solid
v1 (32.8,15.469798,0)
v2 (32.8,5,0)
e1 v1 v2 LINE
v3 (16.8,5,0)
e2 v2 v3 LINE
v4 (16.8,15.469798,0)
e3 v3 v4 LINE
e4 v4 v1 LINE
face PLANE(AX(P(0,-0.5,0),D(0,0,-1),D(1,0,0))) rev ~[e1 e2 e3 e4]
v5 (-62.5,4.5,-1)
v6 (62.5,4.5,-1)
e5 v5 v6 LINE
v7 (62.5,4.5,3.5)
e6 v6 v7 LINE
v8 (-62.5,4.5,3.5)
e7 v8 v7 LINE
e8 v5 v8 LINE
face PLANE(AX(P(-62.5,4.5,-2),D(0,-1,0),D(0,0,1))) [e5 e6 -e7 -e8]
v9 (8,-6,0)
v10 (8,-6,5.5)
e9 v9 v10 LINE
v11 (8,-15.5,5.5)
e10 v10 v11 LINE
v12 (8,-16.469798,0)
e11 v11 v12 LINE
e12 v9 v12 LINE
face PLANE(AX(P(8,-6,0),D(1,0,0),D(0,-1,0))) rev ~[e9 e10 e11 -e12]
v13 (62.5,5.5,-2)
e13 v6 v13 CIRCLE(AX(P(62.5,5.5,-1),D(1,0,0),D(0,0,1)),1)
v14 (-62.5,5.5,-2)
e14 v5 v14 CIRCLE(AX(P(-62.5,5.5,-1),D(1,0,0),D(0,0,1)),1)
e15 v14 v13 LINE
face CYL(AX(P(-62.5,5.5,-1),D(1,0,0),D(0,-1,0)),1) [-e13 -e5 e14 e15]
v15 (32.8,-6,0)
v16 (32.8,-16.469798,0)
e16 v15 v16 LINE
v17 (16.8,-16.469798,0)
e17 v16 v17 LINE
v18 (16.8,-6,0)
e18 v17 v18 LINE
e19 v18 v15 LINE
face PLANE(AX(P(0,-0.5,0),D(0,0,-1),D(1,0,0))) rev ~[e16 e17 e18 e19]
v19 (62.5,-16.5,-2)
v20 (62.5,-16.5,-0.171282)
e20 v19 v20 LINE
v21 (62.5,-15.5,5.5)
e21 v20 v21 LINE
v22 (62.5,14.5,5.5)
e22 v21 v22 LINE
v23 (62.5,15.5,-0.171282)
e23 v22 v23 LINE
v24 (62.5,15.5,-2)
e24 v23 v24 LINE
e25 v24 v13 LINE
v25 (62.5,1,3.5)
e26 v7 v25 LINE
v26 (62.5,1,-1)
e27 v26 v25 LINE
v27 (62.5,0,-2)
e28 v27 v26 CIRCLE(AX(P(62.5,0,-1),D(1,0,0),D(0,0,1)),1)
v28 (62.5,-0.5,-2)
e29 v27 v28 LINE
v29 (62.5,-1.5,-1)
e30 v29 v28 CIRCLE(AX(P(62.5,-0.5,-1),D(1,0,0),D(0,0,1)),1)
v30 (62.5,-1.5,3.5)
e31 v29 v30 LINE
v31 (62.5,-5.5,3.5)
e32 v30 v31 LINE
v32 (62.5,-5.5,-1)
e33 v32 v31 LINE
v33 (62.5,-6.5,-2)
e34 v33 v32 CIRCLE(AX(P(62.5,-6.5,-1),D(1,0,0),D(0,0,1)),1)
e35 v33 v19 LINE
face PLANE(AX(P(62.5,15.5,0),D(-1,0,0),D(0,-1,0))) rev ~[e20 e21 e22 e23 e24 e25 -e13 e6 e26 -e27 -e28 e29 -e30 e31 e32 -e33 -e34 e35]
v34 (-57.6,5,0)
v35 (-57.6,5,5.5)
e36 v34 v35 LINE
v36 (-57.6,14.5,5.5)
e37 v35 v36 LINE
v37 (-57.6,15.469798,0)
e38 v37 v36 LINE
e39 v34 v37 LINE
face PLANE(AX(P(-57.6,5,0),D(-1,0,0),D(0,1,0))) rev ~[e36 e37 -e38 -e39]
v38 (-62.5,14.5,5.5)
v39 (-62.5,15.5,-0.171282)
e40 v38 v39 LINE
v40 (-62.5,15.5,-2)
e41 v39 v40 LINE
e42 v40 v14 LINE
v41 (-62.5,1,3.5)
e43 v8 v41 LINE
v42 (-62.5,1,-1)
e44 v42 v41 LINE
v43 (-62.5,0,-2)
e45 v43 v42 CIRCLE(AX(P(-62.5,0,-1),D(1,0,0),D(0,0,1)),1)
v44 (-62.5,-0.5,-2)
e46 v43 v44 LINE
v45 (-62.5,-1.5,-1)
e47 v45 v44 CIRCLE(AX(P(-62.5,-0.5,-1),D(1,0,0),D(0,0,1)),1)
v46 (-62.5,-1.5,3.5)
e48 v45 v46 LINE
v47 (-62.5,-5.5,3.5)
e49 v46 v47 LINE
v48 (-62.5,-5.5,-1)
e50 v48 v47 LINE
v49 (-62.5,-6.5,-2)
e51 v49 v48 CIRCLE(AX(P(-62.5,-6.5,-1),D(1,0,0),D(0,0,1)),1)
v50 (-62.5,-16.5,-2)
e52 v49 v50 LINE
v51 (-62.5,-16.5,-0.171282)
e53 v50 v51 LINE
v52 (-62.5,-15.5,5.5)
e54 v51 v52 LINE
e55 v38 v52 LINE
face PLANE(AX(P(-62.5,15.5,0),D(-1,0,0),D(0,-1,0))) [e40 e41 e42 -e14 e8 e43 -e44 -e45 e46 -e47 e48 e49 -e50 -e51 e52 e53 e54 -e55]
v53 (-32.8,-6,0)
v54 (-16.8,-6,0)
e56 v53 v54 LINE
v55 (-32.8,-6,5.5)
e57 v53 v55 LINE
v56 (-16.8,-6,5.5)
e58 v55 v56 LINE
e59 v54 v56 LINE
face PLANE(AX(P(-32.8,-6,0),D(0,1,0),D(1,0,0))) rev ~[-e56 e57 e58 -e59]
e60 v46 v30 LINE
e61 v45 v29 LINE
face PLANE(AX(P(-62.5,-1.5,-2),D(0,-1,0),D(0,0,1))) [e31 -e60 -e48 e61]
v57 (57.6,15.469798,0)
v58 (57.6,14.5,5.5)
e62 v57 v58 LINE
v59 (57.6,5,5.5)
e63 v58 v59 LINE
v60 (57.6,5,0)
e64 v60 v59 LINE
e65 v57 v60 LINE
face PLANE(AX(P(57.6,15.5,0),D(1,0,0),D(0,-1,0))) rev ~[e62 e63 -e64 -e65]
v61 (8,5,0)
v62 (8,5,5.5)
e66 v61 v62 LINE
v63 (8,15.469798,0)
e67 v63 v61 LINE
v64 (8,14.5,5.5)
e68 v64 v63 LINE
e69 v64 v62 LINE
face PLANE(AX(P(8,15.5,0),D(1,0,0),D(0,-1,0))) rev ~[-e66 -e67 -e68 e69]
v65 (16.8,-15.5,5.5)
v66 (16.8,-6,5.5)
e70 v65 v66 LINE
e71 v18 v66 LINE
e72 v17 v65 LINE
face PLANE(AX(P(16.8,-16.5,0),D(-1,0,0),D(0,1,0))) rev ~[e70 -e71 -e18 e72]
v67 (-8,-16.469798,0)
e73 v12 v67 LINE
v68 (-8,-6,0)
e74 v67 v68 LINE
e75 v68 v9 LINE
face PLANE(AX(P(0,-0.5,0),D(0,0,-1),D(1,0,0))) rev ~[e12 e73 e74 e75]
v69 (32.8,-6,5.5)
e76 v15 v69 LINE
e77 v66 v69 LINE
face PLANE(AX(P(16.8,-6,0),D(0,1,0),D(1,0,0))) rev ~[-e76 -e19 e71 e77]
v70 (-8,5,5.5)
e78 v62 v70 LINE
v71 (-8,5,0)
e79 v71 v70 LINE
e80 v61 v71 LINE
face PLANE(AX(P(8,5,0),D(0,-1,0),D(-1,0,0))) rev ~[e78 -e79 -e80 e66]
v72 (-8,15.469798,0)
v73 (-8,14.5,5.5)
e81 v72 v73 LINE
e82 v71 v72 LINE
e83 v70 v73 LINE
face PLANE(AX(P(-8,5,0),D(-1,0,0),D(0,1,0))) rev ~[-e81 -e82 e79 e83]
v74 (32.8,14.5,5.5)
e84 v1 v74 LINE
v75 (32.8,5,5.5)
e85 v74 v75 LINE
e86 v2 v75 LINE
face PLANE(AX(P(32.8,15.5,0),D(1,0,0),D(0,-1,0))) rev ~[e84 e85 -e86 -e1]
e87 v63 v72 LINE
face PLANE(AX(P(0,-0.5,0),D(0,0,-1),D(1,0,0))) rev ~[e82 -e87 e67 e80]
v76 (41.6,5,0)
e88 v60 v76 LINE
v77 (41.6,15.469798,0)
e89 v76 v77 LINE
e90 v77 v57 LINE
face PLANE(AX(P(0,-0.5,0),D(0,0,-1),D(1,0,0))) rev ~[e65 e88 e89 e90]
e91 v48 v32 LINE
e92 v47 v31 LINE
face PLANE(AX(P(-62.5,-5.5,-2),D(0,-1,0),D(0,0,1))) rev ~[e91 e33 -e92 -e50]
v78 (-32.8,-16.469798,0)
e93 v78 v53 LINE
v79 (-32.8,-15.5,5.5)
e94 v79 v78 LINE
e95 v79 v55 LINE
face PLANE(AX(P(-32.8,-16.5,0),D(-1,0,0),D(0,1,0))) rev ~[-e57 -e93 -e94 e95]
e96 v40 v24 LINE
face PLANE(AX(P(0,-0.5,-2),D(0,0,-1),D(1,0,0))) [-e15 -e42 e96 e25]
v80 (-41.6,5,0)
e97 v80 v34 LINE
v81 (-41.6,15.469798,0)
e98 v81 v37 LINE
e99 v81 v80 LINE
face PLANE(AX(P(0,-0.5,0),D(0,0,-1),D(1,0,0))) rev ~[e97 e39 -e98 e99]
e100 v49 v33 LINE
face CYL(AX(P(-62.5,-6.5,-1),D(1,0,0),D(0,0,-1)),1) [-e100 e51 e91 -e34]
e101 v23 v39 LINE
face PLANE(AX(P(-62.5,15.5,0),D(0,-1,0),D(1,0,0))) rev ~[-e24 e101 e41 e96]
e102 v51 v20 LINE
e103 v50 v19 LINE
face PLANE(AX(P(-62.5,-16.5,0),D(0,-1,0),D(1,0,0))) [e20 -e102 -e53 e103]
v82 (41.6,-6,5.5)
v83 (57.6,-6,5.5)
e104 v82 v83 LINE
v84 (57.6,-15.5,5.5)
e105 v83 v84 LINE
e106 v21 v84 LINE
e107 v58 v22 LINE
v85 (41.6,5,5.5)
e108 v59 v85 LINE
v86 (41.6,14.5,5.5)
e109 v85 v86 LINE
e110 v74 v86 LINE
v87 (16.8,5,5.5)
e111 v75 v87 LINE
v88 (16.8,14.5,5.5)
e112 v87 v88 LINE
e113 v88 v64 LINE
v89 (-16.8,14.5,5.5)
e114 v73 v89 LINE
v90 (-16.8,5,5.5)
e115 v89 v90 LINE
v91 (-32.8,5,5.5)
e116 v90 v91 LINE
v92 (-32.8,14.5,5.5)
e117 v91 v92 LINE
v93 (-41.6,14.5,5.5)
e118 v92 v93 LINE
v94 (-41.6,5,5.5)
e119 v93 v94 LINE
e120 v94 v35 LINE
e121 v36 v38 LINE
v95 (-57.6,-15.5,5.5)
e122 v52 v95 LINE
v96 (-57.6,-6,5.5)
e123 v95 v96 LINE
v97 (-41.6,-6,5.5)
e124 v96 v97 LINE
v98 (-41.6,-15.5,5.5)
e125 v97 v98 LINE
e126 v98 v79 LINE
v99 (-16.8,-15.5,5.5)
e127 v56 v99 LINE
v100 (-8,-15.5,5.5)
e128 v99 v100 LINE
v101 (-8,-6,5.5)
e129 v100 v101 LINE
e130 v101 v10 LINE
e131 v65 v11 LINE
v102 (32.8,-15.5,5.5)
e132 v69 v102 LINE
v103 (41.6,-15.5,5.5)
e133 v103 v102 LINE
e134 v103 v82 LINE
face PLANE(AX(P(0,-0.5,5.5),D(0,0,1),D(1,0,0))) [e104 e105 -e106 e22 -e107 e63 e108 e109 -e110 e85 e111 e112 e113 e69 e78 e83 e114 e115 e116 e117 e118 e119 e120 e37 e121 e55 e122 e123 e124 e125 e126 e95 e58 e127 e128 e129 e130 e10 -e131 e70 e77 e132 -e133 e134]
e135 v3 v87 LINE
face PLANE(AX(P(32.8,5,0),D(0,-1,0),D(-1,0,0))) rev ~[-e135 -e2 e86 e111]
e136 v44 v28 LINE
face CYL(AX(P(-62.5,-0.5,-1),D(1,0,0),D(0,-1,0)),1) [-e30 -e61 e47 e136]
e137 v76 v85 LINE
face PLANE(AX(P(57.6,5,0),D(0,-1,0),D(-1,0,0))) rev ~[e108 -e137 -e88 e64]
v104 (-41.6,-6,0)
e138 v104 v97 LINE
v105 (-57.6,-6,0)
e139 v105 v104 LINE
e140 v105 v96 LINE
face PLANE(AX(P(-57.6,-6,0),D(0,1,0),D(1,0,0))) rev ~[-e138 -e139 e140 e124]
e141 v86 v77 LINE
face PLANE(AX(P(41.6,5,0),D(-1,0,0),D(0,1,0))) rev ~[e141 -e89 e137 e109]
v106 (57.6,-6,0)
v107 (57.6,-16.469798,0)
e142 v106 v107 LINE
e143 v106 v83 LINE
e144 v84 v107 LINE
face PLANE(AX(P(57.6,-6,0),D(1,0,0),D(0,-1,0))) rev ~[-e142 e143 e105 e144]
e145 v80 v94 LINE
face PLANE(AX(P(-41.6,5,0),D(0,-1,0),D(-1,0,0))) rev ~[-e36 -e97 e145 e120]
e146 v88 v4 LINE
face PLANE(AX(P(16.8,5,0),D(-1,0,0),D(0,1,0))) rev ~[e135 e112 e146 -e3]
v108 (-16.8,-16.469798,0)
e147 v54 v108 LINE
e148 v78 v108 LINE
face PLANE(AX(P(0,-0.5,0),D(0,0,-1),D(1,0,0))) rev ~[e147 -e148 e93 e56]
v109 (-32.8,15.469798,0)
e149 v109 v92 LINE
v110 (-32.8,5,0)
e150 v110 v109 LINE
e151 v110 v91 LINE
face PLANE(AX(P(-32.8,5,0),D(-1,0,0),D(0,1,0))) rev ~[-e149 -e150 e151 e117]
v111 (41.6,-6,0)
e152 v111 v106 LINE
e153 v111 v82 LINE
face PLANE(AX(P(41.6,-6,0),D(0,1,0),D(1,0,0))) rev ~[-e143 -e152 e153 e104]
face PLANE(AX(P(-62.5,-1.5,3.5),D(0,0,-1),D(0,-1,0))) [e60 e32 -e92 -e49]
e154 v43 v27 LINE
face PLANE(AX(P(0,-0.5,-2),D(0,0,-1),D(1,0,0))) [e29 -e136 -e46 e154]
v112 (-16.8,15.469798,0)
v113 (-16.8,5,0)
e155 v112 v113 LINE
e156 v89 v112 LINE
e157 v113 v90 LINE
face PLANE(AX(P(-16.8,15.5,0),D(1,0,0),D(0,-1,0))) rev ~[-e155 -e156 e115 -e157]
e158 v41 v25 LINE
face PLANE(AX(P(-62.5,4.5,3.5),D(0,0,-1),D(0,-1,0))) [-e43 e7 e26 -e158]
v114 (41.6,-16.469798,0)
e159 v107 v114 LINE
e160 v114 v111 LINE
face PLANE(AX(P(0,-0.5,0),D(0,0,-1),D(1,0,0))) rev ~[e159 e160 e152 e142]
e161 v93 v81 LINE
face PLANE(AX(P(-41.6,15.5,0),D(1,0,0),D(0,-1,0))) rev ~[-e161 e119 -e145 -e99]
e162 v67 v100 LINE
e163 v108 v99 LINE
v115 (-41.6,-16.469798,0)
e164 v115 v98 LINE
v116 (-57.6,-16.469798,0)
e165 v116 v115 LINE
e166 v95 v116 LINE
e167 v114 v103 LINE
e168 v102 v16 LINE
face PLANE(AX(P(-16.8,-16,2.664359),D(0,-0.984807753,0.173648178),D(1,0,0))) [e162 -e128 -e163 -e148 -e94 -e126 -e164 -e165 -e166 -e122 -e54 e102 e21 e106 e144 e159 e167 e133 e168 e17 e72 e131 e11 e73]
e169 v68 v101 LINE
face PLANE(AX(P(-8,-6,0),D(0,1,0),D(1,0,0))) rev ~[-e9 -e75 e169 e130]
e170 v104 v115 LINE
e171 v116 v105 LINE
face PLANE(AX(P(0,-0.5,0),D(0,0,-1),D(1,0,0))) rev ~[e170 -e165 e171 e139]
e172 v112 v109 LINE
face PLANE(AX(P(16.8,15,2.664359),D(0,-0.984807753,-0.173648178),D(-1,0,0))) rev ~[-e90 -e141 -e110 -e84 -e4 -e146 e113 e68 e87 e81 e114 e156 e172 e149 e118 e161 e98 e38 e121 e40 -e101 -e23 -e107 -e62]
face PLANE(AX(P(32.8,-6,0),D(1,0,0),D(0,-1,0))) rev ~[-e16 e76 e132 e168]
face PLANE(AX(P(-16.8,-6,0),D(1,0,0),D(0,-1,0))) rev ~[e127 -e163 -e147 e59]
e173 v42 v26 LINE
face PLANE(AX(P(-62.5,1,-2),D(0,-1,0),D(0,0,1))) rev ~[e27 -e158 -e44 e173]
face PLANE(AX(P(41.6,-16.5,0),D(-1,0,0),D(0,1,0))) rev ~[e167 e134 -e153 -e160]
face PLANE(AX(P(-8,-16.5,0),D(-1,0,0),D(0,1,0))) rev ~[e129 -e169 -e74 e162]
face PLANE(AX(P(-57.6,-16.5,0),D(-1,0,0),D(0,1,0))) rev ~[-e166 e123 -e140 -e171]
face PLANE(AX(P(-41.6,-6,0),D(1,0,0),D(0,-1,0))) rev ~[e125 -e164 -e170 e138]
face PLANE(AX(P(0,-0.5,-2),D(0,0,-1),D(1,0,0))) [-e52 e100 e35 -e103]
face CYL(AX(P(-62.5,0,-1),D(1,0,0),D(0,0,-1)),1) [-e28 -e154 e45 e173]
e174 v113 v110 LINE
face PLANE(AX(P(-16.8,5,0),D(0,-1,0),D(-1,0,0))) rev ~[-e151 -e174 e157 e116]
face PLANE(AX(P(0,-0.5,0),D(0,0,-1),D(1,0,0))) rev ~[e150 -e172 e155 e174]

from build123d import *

# Parameters (mm, degrees)
F1_DEPTH    = 5.5
F2_W        = 125
F2_H        = 32
F3_DEPTH    = 2
F4_W        = 3.5
F4_H        = 5.5
F4_W_2      = 4
F5_DEPTH    = 125
F6_R        = 1
F7_C1_SIZE2 = 1
F7_C1_SIZE  = 5.6712818196
F7_C2_SIZE2 = 5.6712818196
F7_C2_SIZE  = 1


with BuildPart() as f1:
    # F0 (on Top) → F1 (new body)
    with BuildSketch(Plane.XY):
        Polygon((57.6, -16.5), (62.5, -16.5), (62.5, 15.5), (57.6, 15.5), (57.6, 5), (41.6, 5), (41.6, 15.5), (32.8, 15.5), (32.8, 5), (16.8, 5), (16.8, 15.5), (8, 15.5), (8, 5), (-8, 5), (-8, 15.5), (-16.8, 15.5), (-16.8, 5), (-32.8, 5), (-32.8, 15.5), (-41.6, 15.5), (-41.6, 5), (-57.6, 5), (-57.6, 15.5), (-62.5, 15.5), (-62.5, -16.5), (-57.6, -16.5), (-57.6, -6), (-41.6, -6), (-41.6, -16.5), (-32.8, -16.5), (-32.8, -6), (-16.8, -6), (-16.8, -16.5), (-8, -16.5), (-8, -6), (8, -6), (8, -16.5), (16.8, -16.5), (16.8, -6), (32.8, -6), (32.8, -16.5), (41.6, -16.5), (41.6, -6), (57.6, -6), align=None)
    extrude(amount=F1_DEPTH)

    # F2 (on face) → F3 (join)
    with BuildSketch(Plane(origin=(0, 0, 0), x_dir=(1, 0, 0), z_dir=(0, 0, -1))):
        with Locations((0, 0.5)):
            Rectangle(F2_W, F2_H)
    extrude(amount=F3_DEPTH)

    # F4 (on face) → F5 (cut, through all)
    with BuildSketch(Plane(origin=(-62.5, 0, 0), x_dir=(0, -1, 0), z_dir=(-1, 0, 0))):
        with Locations((-2.75, 0.75)):
            Rectangle(F4_W, F4_H)
        with Locations((3.5, 0.75)):
            Rectangle(F4_W_2, F4_H)
    extrude(amount=-F5_DEPTH, mode=Mode.SUBTRACT)

    # F6
    f6_edges = [f1.edges().sort_by_distance(p)[0] for p in [
        (0, 4.5, -2),
        (0, 1, -2),
        (0, -5.5, -2),
        (0, -1.5, -2),
    ]]
    fillet(f6_edges, radius=F6_R)

    # F7: chamfer of 1 x 5.6712818196 on 12 edges, made by hand

    # F7_c1
    f7_c1_edges = [f1.edges().sort_by_distance(p)[0] for p in [
        (-12.4, -16.5, 5.5),
    ]]
    f7_c1_side = f1.faces().sort_by_distance((-12.4, -16.5, 5.48))[0]
    chamfer(f7_c1_edges, length=F7_C1_SIZE, length2=F7_C1_SIZE2, reference=f7_c1_side)

    # F7_c2
    f7_c2_edges = [f1.edges().sort_by_distance(p)[0] for p in [
        (12.4, 15.5, 5.5),
    ]]
    f7_c2_side = f1.faces().sort_by_distance((12.4, 15.48, 5.5))[0]
    chamfer(f7_c2_edges, length=F7_C2_SIZE, length2=F7_C2_SIZE2, reference=f7_c2_side)


solid = f1.part
